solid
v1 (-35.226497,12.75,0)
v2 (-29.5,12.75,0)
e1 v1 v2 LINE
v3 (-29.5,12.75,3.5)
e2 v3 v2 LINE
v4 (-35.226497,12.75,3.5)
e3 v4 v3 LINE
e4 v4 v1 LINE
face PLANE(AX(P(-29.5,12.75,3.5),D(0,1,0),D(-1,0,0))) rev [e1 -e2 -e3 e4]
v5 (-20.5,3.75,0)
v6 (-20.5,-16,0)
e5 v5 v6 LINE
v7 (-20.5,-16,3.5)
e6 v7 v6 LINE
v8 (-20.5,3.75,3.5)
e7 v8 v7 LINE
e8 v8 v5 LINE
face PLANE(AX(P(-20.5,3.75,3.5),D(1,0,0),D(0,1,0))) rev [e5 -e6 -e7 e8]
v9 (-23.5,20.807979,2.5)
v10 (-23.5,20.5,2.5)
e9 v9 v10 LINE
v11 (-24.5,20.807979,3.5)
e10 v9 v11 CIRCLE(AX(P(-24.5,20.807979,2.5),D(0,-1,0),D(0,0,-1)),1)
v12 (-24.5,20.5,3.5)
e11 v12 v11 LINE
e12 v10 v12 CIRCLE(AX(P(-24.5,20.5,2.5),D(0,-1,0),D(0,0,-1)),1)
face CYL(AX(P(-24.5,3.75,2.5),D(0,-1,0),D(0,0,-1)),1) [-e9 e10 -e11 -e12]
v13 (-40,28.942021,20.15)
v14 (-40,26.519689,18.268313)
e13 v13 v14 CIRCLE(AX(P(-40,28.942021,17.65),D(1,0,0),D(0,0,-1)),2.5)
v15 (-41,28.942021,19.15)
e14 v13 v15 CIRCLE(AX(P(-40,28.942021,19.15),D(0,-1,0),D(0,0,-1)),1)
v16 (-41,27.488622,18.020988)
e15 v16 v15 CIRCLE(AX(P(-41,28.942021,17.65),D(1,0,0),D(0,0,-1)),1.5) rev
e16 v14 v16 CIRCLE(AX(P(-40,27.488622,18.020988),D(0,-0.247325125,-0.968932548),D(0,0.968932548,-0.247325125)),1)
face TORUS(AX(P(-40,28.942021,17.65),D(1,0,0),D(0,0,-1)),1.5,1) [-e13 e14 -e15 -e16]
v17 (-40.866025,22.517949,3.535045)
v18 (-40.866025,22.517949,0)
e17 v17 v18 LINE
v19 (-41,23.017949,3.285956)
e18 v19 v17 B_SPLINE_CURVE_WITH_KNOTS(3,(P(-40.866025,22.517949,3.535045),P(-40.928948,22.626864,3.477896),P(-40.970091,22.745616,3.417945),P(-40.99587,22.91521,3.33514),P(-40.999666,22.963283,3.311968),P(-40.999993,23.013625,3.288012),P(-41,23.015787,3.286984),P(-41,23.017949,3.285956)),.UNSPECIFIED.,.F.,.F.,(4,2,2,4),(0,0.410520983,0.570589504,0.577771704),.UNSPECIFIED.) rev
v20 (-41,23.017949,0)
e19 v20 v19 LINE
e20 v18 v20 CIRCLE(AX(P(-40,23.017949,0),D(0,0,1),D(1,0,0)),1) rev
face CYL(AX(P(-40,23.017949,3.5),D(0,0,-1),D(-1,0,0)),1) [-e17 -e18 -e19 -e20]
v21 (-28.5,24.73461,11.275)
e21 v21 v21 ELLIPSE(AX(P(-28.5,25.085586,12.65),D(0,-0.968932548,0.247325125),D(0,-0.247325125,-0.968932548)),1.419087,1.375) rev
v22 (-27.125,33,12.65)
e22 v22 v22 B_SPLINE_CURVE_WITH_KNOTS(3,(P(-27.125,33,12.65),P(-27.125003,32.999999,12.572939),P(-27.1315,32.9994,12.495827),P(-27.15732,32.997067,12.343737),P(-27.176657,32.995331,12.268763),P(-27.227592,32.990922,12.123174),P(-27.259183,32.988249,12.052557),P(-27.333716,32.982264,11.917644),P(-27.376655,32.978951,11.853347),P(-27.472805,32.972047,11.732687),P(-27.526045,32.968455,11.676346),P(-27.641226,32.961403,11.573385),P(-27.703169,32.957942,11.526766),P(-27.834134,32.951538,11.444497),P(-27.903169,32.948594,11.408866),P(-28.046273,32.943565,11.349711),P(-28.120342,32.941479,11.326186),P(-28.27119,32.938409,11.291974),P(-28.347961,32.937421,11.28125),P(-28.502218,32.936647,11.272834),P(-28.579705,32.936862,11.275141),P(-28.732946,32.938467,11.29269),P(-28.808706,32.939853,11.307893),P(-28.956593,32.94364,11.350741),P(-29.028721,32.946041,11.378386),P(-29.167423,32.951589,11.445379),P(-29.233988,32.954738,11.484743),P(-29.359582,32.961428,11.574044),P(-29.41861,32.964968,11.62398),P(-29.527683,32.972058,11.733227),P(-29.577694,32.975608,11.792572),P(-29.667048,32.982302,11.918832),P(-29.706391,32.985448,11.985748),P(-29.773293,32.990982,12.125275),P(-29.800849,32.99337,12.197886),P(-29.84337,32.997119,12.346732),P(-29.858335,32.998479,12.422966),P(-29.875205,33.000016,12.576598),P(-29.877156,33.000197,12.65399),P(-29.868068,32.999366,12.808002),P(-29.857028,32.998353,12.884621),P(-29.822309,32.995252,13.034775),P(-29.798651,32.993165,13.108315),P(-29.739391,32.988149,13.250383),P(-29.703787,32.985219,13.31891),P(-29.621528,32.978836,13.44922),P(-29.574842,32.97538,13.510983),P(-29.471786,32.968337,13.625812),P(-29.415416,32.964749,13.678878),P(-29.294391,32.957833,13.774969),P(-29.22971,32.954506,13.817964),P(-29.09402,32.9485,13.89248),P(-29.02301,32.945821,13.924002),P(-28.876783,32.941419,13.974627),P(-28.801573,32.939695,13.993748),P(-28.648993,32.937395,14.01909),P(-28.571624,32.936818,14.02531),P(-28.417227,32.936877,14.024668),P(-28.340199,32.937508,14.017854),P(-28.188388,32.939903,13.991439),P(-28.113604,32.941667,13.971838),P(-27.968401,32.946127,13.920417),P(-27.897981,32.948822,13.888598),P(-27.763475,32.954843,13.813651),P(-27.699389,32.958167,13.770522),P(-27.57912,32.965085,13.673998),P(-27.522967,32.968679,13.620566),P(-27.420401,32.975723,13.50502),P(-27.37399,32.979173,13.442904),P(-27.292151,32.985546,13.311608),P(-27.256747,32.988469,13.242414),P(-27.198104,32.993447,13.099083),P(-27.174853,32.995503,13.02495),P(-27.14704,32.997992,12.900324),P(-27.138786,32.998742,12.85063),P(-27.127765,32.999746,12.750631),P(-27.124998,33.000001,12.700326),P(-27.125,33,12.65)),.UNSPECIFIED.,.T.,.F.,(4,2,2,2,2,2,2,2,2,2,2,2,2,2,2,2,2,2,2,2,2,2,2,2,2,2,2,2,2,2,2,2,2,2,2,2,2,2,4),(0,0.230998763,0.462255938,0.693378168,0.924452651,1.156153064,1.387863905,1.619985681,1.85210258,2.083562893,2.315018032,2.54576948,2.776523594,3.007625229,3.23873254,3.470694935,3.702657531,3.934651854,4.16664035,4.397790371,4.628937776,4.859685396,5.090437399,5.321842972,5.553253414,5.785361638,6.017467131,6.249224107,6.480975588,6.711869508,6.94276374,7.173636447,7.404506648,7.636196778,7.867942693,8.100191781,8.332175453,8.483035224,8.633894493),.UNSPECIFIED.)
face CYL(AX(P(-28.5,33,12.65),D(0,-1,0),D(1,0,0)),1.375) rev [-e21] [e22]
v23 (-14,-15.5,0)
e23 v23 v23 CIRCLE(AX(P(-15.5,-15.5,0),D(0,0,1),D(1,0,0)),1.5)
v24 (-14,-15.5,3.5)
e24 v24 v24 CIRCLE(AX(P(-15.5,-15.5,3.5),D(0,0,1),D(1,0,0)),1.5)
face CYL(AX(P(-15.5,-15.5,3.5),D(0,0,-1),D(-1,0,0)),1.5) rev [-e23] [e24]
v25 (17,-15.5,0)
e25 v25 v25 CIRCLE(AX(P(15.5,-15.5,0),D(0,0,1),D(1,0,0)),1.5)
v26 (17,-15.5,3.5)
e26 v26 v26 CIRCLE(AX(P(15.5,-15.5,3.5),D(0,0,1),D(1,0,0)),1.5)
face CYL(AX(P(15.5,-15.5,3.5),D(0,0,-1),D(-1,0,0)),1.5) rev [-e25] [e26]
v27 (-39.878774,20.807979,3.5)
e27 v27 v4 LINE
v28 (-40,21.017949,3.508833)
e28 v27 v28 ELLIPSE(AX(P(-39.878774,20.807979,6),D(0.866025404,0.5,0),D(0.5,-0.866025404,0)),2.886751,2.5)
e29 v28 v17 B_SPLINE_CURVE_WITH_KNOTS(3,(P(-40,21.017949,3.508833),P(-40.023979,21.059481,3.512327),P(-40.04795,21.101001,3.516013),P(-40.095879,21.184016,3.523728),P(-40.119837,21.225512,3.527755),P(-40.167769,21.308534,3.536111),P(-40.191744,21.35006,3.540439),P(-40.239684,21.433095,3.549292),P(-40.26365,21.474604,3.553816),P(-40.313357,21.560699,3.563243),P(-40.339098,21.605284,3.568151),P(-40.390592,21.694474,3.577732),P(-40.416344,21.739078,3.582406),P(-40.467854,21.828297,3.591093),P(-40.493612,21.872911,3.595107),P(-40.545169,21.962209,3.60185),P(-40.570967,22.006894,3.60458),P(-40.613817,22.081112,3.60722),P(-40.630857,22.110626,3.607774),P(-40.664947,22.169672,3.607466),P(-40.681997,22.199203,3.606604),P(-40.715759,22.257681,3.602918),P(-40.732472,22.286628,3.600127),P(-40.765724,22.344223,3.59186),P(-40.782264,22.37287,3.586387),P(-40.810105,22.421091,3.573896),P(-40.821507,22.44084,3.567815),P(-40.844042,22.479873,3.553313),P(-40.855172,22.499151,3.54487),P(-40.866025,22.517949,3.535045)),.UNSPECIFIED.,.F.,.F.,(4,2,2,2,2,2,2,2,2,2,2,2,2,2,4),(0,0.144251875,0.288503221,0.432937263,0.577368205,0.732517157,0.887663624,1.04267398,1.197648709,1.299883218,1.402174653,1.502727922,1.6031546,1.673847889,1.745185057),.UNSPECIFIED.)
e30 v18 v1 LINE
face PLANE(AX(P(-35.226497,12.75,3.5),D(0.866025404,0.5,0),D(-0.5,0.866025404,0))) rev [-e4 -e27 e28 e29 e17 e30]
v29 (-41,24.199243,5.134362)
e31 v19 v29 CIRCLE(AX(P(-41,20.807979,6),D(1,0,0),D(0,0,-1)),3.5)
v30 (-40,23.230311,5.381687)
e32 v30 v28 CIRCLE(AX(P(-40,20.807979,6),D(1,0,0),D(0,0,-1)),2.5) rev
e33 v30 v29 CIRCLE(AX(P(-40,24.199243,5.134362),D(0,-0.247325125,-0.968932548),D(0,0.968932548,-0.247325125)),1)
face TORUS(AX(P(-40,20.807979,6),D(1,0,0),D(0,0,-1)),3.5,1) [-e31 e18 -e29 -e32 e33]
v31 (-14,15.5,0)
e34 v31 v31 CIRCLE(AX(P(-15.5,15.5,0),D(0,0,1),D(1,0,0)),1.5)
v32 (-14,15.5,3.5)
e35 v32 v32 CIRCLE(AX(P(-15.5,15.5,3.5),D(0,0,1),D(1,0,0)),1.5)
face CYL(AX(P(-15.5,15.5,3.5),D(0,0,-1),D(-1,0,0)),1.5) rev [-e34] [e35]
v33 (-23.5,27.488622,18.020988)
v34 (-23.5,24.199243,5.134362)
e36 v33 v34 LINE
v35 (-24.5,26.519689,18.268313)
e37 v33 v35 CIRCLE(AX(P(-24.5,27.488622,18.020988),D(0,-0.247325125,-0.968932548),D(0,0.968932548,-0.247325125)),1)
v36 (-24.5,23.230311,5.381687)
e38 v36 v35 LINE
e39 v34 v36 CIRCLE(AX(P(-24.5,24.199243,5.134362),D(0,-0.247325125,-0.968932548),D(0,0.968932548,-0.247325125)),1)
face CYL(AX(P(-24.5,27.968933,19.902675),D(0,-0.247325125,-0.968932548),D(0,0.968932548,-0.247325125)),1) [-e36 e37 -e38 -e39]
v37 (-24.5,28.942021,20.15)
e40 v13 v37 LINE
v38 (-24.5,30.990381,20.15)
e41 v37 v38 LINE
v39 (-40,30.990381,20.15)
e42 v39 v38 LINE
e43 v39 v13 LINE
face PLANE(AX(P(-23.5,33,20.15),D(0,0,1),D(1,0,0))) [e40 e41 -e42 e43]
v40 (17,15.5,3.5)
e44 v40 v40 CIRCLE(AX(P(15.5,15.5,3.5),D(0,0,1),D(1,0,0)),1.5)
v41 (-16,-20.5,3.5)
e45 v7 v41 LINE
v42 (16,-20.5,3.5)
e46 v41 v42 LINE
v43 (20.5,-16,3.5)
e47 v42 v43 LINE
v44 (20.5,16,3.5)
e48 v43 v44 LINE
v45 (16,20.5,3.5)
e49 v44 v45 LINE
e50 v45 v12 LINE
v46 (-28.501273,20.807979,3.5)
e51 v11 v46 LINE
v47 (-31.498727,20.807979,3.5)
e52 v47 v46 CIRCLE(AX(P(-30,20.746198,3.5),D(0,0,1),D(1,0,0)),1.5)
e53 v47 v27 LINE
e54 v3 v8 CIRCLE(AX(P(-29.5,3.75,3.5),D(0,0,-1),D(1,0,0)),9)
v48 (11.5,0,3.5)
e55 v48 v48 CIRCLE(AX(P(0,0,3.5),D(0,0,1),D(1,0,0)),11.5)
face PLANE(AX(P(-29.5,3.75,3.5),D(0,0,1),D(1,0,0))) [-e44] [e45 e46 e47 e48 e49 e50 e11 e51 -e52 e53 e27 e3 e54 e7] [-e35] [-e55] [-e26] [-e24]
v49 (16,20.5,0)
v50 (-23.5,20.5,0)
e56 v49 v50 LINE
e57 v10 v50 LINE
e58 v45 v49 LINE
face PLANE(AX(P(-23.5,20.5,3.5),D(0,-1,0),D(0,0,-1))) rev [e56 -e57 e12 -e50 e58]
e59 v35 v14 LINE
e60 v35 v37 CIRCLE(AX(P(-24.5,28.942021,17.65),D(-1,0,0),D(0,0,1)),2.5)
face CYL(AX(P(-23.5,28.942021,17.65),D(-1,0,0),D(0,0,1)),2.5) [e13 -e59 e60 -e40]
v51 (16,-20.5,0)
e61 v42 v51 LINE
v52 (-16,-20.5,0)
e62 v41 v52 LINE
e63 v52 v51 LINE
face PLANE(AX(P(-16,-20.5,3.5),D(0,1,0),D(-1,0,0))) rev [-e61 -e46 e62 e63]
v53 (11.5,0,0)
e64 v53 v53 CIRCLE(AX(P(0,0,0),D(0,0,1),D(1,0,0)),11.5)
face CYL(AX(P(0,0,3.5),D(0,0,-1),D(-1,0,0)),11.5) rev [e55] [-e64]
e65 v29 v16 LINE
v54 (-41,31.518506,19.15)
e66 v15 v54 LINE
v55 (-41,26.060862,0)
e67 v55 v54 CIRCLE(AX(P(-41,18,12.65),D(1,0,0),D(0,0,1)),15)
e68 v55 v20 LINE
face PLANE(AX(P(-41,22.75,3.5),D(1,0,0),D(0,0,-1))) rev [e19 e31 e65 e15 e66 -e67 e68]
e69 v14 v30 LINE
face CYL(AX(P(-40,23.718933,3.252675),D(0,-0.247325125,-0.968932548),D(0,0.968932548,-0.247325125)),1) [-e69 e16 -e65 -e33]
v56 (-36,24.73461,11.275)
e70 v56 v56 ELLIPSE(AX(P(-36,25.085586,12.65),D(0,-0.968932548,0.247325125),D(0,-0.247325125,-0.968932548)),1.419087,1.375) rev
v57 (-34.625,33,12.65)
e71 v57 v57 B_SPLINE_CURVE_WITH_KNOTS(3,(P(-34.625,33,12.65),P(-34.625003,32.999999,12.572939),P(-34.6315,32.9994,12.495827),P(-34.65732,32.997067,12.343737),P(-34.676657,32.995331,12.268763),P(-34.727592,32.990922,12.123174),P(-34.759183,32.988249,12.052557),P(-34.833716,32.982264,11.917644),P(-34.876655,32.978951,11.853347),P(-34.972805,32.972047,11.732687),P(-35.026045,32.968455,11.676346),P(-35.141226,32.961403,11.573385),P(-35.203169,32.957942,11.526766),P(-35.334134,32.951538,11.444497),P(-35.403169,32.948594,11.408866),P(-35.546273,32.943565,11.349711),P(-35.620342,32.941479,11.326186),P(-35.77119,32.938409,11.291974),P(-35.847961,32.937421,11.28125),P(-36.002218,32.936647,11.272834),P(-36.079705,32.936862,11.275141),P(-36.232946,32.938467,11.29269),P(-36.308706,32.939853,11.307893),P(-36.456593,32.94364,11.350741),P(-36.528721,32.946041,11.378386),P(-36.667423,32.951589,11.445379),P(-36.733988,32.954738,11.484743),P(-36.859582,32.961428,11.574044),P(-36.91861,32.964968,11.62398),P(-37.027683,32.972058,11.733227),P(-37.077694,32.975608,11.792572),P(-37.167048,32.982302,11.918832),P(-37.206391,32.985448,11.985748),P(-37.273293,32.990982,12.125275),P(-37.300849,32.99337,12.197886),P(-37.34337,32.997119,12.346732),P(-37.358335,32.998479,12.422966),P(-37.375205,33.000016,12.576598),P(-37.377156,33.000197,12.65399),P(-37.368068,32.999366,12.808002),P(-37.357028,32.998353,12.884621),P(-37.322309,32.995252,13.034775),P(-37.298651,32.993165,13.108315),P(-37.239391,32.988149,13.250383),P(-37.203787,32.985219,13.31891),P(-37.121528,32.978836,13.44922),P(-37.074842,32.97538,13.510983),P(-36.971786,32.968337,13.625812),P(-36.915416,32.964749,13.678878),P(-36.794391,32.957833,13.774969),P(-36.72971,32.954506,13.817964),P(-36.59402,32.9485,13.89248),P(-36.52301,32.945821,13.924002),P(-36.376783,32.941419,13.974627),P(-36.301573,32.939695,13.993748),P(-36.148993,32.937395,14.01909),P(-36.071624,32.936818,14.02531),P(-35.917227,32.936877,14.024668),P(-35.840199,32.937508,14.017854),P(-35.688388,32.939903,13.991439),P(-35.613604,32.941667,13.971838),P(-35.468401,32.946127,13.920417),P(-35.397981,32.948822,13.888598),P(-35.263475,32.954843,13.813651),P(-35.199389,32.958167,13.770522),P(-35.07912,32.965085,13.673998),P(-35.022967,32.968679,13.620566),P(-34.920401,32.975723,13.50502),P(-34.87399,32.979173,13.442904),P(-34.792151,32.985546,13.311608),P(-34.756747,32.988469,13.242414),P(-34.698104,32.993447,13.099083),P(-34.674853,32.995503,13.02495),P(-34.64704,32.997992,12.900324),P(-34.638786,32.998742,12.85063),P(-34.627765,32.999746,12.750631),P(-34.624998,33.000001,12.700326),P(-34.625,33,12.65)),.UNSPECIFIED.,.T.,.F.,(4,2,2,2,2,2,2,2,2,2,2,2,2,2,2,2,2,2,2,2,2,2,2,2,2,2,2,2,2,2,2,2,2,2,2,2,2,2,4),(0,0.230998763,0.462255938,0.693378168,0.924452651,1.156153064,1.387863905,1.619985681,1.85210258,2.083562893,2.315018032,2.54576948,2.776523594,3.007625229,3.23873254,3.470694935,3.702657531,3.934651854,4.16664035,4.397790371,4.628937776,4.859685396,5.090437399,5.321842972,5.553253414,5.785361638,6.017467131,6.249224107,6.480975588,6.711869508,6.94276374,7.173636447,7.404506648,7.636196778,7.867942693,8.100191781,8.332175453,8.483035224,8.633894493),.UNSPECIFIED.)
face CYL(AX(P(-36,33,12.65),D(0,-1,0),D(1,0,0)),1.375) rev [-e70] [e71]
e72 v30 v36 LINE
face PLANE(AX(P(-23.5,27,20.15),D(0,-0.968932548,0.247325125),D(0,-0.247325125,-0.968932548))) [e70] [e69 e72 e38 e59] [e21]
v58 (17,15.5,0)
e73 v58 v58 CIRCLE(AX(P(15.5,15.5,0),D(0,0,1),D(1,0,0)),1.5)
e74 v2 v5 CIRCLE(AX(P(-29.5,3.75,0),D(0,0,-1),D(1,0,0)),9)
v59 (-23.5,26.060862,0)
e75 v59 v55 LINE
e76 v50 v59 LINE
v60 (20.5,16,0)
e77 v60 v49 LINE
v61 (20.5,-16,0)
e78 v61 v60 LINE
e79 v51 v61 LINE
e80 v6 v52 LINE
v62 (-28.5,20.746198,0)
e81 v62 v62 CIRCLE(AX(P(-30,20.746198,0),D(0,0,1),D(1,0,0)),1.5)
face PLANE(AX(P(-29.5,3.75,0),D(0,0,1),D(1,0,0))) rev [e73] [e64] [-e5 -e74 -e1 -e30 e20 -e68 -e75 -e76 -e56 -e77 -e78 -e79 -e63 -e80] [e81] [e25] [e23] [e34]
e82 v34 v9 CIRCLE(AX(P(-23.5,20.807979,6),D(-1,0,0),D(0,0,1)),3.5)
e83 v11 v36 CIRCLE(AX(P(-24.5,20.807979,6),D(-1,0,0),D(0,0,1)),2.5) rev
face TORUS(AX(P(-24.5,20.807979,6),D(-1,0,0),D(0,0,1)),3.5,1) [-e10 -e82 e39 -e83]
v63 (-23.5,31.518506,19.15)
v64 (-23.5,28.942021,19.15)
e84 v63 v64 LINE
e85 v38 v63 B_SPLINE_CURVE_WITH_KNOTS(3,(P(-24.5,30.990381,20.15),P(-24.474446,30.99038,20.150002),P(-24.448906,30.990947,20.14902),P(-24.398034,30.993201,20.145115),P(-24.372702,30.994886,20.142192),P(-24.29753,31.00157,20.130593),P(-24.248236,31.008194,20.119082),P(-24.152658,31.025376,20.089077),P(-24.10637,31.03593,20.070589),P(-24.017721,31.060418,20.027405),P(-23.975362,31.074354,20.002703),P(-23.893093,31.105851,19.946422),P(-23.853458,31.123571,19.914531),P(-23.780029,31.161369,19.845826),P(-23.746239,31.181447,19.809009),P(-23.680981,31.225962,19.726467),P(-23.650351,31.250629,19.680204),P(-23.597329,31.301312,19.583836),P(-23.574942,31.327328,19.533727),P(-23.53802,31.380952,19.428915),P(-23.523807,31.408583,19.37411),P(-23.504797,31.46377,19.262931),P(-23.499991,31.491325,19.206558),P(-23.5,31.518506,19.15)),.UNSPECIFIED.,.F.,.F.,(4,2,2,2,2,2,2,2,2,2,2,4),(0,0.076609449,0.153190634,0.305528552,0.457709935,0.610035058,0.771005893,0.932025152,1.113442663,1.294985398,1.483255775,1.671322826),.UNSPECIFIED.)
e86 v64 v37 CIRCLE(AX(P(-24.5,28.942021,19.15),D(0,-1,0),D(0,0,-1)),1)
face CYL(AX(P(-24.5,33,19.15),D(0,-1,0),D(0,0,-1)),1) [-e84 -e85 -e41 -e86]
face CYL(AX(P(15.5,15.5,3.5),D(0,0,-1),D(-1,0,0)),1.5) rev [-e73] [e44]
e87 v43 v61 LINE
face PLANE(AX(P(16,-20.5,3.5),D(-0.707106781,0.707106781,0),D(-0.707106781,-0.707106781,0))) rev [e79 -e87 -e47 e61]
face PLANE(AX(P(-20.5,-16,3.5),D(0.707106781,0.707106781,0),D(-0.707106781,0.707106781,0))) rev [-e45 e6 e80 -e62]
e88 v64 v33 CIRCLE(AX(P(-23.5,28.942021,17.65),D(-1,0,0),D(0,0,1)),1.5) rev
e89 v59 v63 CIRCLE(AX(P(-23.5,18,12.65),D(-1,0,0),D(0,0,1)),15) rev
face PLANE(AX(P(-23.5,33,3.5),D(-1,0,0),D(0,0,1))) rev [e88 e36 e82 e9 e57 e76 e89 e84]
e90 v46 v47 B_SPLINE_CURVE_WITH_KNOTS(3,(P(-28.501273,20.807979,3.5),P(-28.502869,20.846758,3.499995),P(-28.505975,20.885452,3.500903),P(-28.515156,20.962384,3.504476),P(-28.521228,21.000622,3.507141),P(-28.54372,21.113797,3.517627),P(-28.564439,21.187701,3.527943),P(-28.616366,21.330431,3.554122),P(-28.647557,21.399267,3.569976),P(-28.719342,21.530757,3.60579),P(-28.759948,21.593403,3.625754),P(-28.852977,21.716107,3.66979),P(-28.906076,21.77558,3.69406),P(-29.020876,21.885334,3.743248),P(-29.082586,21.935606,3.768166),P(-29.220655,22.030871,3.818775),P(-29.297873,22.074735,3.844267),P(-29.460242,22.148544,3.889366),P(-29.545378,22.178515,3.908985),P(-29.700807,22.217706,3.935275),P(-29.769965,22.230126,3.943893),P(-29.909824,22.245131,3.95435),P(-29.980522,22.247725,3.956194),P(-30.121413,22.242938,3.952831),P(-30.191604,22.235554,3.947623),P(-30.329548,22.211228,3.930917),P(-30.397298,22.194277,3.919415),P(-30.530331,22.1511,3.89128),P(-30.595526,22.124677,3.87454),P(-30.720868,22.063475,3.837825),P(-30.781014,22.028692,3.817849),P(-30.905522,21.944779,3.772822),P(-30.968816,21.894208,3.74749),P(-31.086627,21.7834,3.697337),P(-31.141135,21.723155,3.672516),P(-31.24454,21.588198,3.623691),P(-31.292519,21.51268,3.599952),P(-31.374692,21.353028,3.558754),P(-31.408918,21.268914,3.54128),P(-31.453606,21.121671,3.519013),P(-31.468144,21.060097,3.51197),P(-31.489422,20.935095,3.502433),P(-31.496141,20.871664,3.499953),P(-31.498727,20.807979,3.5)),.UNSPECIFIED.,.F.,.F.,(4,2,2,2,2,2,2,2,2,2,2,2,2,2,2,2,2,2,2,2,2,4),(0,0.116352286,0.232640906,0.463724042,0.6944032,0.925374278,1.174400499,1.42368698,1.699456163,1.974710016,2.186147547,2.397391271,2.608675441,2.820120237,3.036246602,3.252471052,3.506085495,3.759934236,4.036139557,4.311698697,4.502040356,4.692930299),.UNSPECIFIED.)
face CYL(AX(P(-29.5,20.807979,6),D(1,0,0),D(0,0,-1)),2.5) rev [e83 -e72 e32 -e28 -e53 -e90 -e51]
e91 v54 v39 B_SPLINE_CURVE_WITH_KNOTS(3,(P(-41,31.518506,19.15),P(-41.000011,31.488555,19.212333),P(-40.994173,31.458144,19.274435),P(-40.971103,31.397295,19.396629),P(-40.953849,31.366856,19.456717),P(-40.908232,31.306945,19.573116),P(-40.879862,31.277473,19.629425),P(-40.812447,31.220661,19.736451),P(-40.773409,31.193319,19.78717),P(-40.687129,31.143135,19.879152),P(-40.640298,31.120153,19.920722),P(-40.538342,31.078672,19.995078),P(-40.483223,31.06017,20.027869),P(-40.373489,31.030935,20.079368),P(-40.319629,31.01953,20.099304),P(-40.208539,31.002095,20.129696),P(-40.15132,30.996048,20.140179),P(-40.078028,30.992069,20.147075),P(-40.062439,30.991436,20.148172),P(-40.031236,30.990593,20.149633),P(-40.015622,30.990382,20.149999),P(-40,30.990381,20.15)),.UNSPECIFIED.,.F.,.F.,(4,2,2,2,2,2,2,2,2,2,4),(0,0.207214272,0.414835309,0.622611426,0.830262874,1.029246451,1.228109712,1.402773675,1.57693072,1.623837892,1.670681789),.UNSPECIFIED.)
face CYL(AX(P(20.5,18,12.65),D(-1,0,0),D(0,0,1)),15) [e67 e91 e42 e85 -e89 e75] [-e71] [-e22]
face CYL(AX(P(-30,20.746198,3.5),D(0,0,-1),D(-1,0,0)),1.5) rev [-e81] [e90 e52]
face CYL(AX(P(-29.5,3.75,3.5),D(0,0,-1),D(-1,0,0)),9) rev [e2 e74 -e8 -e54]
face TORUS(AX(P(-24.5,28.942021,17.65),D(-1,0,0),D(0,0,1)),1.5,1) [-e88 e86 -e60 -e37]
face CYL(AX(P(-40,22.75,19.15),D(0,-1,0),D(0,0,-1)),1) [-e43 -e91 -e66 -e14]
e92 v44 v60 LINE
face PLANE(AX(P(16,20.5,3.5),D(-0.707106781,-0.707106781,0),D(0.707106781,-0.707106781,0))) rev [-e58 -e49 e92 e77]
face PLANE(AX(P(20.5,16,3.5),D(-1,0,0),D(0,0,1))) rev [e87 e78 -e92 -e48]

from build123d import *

# Parameters (mm, degrees)
SKETCH1_R           = 11.5
SKETCH1_R_2         = 1.4999999999999991
SKETCH1_R_3         = 1.4999999999999987
SKETCH1_R_4         = 1.5000000000000009
SKETCH1_R_5         = 1.5000000000000002
BOSS_EXTRUDE1_DEPTH = 3.5
BOSS_EXTRUDE2_DEPTH = 17.5
CUT_EXTRUDE1_DEPTH  = 73.64483808227534
SKETCH4_R           = 1.3750000000000042
SKETCH4_R_2         = 1.375000000000001
CUT_EXTRUDE2_DEPTH  = 266.22147666332955
FILLET1_R           = 2.5
FILLET2_R           = 1


with BuildPart() as part:
    # Sketch1 → Boss-Extrude1 (new body)
    with BuildSketch(Plane.XY):
        with BuildLine():
            Line((-20.5, -16.000000000000007), (-15.999999999999996, -20.500000000000007))
            Line((-15.999999999999996, -20.500000000000007), (16.000000000000004, -20.5))
            Line((16.000000000000004, -20.5), (20.5, -16))
            Line((20.5, -16), (20.5, 16))
            Line((20.5, 16), (16.000000000000004, 20.5))
            Line((16.000000000000004, 20.5), (-23.500000000000007, 20.5))
            Line((-23.500000000000007, 20.5), (-23.500000000000007, 33))
            Line((-23.500000000000007, 33), (-41.00000000000001, 33))
            Line((-41.00000000000001, 33), (-41.00000000000001, 22.75))
            Line((-41.00000000000001, 22.75), (-35.22649730810378, 12.75))
            Line((-35.22649730810378, 12.75), (-29.500000000000007, 12.750000000000002))
            ThreePointArc((-29.500000000000007, 12.750000000000002), (-23.136038969321078, 10.11396103067893), (-20.500000000000004, 3.750000000000001))
            Line((-20.500000000000004, 3.750000000000001), (-20.5, -16.000000000000007))
        make_face()
        Circle(SKETCH1_R, mode=Mode.SUBTRACT)
        with Locations((-15.500000000000002, 15.5)):
            Circle(SKETCH1_R_2, mode=Mode.SUBTRACT)
        with Locations((15.500000000000002, 15.499999999999998)):
            Circle(SKETCH1_R_3, mode=Mode.SUBTRACT)
        with Locations((15.5, -15.5)):
            Circle(SKETCH1_R_4, mode=Mode.SUBTRACT)
        with Locations((-15.5, -15.5)):
            Circle(SKETCH1_R_5, mode=Mode.SUBTRACT)
        with Locations((-30.00000000000001, 20.746197723675813)):
            Circle(SKETCH1_R_4, mode=Mode.SUBTRACT)
    extrude(amount=BOSS_EXTRUDE1_DEPTH)

    # Sketch2 → Boss-Extrude2 (add)
    with BuildSketch(Plane.ZY.offset(41.00000000000001)):
        Polygon((3.5, 33), (20.15, 33), (20.15, 27.000000000000004), (3.5, 22.75), align=None)
    extrude(amount=-BOSS_EXTRUDE2_DEPTH)

    # Sketch3 → Cut-Extrude1 (cut, through all)
    with BuildSketch(Plane.ZY.offset(41.00000000000001)):
        with BuildLine():
            Line((0, 26.060862236758553), (0, 38.04576260464925))
            Line((0, 38.04576260464925), (20.15, 38.04576260464925))
            Line((20.15, 38.04576260464925), (20.149999999999995, 30.990381056766584))
            ThreePointArc((20.149999999999995, 30.990381056766584), (9.085499481104915, 32.57032381420525), (0, 26.060862236758553))
        make_face()
    extrude(amount=-CUT_EXTRUDE1_DEPTH, mode=Mode.SUBTRACT)

    # Sketch4 → Cut-Extrude2 (cut, through all)
    with BuildSketch(Plane(origin=(-1.4737e-13, -20.499999999999993, -236.3635116976825), x_dir=(1, 2.2e-16, 0), z_dir=(-2.2e-16, 1, 0))):
        with Locations((-35.99999999999985, -249.01351169768247)):
            Circle(SKETCH4_R)
        with Locations((-28.499999999999844, -249.01351169768247)):
            Circle(SKETCH4_R_2)
    extrude(amount=CUT_EXTRUDE2_DEPTH, mode=Mode.SUBTRACT)

    # Fillet1
    # the kernel refuses this fillet: 2.5 mm, written as the material it adds along each edge
    with BuildSketch(Plane(origin=(-41.00000000000001, 22.75, 3.5), x_dir=(0, -1, 0), z_dir=(1, 0, 0))) as fillet1_piece_1_section:
        with BuildLine():
            CenterArc((FILLET1_R * 0.776808330642, -FILLET1_R), FILLET1_R, 90, 75.68071687498136)
            Line((-FILLET1_R * 0.192124217376, -FILLET1_R * 0.752674875131), (0, 0))
            Line((0, 0), (FILLET1_R * 0.776808330642, 0))
        make_face()
    fillet1_piece_1 = extrude(amount=17.5, mode=Mode.PRIVATE)
    fillet1_piece_1 = split(fillet1_piece_1, bisect_by=Plane(origin=(-38.678687412646255, 18.729368658454117, 3.931557915234251), z_dir=(0.8660254037844398, 0.49999999999999795, 0)), keep=Keep.TOP, mode=Mode.PRIVATE)
    fillet1_piece_1 = fillet1_piece_1 - Plane(origin=(-30.00000000000001, 20.746197723675813, 3.931557915234251), x_dir=(1, 0, 0), z_dir=(0, 0, -1)) * Cylinder(1.5000000000000009, 43, mode=Mode.PRIVATE)
    add(fillet1_piece_1)
    # the kernel refuses this fillet: 2.5 mm, written as the material it takes off along each edge
    with BuildSketch(Plane(origin=(-45.855052066513494, 27.000000000000004, 20.15), x_dir=(0, 1, 0), z_dir=(1, 0, 0))) as fillet1_2_piece_1:
        with BuildLine():
            CenterArc((FILLET1_R * 0.776808330642, -FILLET1_R), FILLET1_R, 90, 75.68071687498119)
            Line((-FILLET1_R * 0.192124217376, -FILLET1_R * 0.752674875131), (0, 0))
            Line((0, 0), (FILLET1_R * 0.776808330642, 0))
        make_face()
    extrude(amount=27.21010413302697, mode=Mode.SUBTRACT)

    # Fillet2
    fillet2_edges = [part.edges().sort_by_distance(p)[0] for p in [
        (-41.00000000000001, 24.875, 11.825),
        (-23.500000000000007, 24.875, 11.825),
        (-41.00000000000001, 29.96620094168579, 20.15),
        (-41, 27.408362134202072, 19.624307730627862),
        (-23.500000000000007, 29.96620094168579, 20.15),
        (-23.5, 27.408362134202072, 19.624307730627862),
        (-41, 23.04189744334401, 4.877676890023187),
        (-23.5, 22.341637865797928, 4.025692269372136),
        (-41, 22.749999999999133, 2.2128286226876686),
        (-23.500000000000007, 20.6539895866975, 3.5),
    ]]
    fillet(fillet2_edges, radius=FILLET2_R)


solid = part.part
